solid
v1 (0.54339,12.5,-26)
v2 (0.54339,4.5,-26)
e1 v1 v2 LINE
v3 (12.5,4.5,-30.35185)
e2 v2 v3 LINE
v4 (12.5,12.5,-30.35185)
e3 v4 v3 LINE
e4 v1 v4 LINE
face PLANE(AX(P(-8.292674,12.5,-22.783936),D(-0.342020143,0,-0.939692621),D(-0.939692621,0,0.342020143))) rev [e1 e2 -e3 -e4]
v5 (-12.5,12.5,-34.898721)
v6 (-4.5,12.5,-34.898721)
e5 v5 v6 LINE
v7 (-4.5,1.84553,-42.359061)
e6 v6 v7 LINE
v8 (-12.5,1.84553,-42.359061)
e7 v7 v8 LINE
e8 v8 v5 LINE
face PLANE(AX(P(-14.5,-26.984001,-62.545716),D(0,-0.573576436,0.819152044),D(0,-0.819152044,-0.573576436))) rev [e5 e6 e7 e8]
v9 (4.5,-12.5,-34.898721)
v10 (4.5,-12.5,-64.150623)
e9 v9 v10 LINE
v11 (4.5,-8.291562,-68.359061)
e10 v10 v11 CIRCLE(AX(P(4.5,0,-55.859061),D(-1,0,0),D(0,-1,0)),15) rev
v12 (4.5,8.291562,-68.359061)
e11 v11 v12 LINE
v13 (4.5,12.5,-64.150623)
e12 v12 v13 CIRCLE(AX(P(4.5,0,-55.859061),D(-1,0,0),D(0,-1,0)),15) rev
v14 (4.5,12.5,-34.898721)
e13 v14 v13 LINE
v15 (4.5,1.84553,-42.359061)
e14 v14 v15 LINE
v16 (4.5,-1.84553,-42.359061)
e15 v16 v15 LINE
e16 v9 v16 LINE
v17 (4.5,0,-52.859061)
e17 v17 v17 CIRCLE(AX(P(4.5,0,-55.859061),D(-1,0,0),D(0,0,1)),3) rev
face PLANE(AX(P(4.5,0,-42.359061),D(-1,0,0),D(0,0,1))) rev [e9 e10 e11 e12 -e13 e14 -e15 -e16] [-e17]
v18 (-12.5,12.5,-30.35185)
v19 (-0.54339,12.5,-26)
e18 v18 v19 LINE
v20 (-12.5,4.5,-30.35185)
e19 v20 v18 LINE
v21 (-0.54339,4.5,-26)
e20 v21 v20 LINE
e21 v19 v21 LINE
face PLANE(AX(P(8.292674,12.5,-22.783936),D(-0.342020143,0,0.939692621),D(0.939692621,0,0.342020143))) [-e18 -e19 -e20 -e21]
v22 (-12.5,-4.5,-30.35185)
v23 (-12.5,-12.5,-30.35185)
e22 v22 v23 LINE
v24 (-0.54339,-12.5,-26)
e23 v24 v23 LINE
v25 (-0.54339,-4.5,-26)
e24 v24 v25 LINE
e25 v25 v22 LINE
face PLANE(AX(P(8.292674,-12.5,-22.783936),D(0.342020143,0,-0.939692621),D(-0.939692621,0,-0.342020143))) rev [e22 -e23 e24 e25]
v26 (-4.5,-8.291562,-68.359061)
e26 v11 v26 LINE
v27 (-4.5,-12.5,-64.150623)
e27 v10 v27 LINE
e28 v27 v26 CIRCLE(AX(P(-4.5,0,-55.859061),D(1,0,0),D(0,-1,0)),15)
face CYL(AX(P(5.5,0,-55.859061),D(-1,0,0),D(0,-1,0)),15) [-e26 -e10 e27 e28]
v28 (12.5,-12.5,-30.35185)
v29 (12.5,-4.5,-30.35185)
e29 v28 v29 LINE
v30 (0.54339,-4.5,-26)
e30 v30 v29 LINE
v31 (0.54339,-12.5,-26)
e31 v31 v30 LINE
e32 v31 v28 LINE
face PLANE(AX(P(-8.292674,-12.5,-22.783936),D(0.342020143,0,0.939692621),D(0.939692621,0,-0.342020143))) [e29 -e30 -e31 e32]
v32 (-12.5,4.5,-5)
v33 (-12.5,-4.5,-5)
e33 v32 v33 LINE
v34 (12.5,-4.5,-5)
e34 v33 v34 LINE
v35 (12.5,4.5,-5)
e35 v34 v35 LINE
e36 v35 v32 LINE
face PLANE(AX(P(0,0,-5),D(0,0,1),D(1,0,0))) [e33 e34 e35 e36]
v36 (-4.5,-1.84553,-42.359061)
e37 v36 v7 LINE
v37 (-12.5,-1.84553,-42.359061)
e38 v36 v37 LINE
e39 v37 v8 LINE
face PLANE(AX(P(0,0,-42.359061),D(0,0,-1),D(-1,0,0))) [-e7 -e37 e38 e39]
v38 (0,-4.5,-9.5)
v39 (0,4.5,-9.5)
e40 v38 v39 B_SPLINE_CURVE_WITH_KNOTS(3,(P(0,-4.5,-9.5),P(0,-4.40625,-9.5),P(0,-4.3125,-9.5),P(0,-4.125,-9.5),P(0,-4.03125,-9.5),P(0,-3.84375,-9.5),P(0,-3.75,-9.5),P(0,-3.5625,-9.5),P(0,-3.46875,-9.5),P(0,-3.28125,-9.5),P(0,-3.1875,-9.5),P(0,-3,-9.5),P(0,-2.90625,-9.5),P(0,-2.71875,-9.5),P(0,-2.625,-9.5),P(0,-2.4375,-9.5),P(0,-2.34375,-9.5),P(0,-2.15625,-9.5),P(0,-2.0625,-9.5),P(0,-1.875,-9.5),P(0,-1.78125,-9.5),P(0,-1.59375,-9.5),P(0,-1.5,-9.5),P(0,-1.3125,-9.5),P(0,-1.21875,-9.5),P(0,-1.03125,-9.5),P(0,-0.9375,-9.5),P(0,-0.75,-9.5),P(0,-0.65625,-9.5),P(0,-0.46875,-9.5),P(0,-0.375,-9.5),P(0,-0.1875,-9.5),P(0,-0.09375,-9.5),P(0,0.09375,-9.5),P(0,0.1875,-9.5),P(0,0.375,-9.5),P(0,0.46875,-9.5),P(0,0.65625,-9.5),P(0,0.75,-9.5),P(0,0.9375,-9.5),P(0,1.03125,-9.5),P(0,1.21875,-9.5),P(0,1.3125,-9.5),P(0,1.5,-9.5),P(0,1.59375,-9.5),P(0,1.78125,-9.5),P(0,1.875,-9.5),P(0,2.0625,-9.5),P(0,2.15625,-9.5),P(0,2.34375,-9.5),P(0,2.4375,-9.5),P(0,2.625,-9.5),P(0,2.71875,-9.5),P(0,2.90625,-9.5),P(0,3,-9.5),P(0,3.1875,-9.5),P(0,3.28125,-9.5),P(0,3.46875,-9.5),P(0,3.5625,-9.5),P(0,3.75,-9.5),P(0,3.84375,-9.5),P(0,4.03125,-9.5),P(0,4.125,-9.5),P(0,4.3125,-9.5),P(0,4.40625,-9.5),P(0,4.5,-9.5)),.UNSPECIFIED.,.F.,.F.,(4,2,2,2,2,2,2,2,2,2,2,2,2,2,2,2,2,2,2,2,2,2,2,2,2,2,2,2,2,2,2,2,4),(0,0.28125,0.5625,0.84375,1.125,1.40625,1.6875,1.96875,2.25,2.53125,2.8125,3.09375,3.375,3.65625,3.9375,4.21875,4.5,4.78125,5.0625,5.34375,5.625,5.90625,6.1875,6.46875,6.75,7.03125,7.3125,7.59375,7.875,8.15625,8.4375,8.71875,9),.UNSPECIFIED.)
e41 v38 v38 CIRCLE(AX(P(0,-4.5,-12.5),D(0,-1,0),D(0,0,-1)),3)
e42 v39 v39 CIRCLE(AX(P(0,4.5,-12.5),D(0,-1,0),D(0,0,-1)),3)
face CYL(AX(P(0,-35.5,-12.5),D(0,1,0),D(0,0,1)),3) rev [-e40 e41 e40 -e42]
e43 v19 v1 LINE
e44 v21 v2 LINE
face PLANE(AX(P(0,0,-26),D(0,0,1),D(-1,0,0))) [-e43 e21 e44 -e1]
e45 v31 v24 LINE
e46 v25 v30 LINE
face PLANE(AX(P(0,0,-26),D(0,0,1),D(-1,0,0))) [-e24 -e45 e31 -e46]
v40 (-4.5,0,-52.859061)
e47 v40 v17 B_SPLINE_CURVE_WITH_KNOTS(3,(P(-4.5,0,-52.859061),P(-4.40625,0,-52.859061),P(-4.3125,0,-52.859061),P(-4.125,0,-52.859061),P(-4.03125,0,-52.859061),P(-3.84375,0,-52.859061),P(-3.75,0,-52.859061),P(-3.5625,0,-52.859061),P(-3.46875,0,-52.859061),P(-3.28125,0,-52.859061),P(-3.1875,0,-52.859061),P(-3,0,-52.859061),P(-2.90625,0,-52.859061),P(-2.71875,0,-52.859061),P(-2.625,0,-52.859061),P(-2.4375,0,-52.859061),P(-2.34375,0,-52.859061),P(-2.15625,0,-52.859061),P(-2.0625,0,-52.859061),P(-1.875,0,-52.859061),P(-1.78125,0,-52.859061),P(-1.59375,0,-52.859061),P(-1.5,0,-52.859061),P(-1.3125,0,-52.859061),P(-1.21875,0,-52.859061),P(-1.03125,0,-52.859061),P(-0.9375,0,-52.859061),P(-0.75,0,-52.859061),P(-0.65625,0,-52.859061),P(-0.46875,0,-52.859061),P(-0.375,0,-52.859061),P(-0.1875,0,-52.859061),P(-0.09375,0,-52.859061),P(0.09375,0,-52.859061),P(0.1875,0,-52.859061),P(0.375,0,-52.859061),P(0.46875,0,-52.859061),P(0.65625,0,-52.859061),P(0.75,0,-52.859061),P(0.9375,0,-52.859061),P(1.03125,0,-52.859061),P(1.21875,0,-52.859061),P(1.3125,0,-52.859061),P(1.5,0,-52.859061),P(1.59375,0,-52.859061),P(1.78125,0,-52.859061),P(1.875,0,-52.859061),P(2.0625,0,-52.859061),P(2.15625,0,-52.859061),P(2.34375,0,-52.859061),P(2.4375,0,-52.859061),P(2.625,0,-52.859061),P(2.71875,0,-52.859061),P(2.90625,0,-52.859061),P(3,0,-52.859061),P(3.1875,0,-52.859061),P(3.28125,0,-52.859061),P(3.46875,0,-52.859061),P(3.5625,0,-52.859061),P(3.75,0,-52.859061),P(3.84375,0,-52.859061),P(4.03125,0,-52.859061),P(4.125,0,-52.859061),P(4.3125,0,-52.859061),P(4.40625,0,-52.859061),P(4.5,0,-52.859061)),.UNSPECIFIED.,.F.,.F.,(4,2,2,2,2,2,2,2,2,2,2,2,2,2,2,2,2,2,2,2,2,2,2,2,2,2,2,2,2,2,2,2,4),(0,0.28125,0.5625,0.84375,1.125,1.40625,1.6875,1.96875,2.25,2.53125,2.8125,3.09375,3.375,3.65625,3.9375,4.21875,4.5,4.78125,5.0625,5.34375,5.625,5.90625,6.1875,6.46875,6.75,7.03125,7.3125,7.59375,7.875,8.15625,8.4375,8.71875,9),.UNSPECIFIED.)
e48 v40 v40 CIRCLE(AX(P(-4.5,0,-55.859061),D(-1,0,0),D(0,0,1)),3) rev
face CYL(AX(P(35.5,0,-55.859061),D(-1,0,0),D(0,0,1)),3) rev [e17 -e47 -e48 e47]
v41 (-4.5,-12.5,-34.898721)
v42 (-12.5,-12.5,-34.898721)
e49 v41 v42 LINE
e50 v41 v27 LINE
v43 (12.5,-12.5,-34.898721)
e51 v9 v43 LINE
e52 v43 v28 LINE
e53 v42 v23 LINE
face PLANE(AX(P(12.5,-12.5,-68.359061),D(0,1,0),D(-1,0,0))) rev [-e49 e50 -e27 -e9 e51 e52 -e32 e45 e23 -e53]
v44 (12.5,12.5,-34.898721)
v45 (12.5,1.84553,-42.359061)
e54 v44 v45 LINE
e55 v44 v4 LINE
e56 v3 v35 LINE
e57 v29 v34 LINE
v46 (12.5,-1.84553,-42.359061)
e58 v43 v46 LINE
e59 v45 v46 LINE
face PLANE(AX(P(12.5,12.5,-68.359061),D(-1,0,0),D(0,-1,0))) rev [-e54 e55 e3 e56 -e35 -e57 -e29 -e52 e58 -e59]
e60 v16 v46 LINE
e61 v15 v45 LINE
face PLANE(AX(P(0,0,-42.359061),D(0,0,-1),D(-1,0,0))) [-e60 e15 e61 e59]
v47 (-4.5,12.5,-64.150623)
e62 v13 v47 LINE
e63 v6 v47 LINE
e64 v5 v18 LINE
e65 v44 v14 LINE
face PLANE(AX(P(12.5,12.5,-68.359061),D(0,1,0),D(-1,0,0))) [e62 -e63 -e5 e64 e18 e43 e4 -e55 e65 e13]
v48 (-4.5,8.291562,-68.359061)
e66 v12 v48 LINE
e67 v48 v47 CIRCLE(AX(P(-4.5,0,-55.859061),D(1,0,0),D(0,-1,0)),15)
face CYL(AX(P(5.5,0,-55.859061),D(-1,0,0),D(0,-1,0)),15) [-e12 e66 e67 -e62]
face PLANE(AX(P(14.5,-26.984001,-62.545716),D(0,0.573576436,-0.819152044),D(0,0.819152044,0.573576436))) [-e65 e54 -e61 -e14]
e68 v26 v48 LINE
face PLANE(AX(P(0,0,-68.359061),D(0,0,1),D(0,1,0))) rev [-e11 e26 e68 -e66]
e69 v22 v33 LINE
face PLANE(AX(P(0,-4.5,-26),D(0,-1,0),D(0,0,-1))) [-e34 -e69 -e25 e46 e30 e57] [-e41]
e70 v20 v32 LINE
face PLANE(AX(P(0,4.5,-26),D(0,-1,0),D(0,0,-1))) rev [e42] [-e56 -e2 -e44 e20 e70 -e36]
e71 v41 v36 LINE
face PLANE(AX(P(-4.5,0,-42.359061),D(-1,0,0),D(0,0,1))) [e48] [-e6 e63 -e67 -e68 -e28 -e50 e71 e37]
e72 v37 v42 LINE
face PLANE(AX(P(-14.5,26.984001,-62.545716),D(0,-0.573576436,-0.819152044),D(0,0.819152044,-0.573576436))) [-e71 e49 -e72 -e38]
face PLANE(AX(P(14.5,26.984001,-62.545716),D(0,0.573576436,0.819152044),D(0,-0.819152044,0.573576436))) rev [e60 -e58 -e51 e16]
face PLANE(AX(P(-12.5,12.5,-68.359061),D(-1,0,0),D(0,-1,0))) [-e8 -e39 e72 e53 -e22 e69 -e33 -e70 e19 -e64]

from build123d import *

# Parameters (mm, degrees)
SKETCH_1_W               = 25
SKETCH_1_H               = 25
EXTRUDE_1_DEPTH          = 68.359061336
SKETCH_2_W               = 25
SKETCH_2_H               = 8
CUT_EXTRUDE_3_DEPTH      = 26
CUT_EXTRUDE_START        = -17
SKETCH_4_R               = 3
CUT_EXTRUDE_4_DEPTH      = 57
MOVE_BODY_1_ANGLE        = 90
SKETCH_5_W               = 25
SKETCH_5_H               = 25
EXTRUDE_2_DEPTH          = 10
SKETCH_9_W               = 25
SKETCH_9_H               = 9
CUT_EXTRUDE_8_DEPTH      = 5
CUT_EXTRUDE_5_DEPTH      = 8
MIRROR_8_COPY_1_DEPTH    = 8
CUT_EXTRUDE_START_2      = 10
SKETCH_8_R               = 3
CUT_EXTRUDE_6_DEPTH      = 10
MIRROR_START             = 10
MIRROR_7_COPY_1_SKETCH_R = 3
MIRROR_7_COPY_1_DEPTH    = 10
CUT_EXTRUDE_9_DEPTH      = 10


# Read off the part's stored shape, not the designer's step: 교차1
with BuildPart() as part:
    # 스케치1 → 보스-돌출1 (new body)
    with BuildSketch(Plane.XY):
        Rectangle(SKETCH_1_W, SKETCH_1_H)
    extrude(amount=-EXTRUDE_1_DEPTH)

    # 스케치2 → 컷-돌출3 (cut)
    with BuildSketch(Plane(origin=(0, 0, -68.359061336), x_dir=(-1, 0, 0), z_dir=(0, 0, -1))):
        with Locations((0, 8.5)):
            Rectangle(SKETCH_2_W, SKETCH_2_H)
        with Locations((0, -8.5)):
            Rectangle(SKETCH_2_W, SKETCH_2_H)
    cut_extrude_3 = extrude(amount=-CUT_EXTRUDE_3_DEPTH, mode=Mode.SUBTRACT)

    # 스케치4 → 컷-돌출4 (cut)
    with BuildSketch(Plane.XZ.offset(-4.5).offset(CUT_EXTRUDE_START)):
        with Locations(Location((0, -55.859061336, 0), (0, 0, 90))):
            Circle(SKETCH_4_R)
    cut_extrude_4 = extrude(amount=CUT_EXTRUDE_4_DEPTH, mode=Mode.SUBTRACT)

    # 대칭 복사4: 컷-돌출3, 컷-돌출4 across plane
    add(cut_extrude_3.mirror(Plane.XY.offset(-34.179530668)), mode=Mode.SUBTRACT)
    add(cut_extrude_4.mirror(Plane.XY.offset(-34.179530668)), mode=Mode.SUBTRACT)


with BuildPart() as body_2:
    # 교차1: the piece on the far side of the plane
    add(part.part)
    split(bisect_by=Plane.XY.offset(-34.179530668), keep=Keep.BOTTOM)


with BuildPart() as part_1:
    add(part.part)

    # 교차1
    split(bisect_by=Plane.XY.offset(-34.179530668), keep=Keep.TOP)



with BuildPart() as body_2_1:
    # Move Body 1: moved
    add(body_2.part.rotate(Axis((0, 0, 0), (0, 0, 1)), MOVE_BODY_1_ANGLE))


with BuildPart() as part_2:
    add(part_1.part)

    add(body_2_1.part)  # 보스-돌출2 merges body 2
    # 스케치5 → 보스-돌출2 (add)
    with BuildSketch(Plane(origin=(0, 0, -42.359061336), x_dir=(-1, 0, 0), z_dir=(0, 0, -1))):
        Rectangle(SKETCH_5_W, SKETCH_5_H)
    extrude(amount=-EXTRUDE_2_DEPTH)

    # 스케치9 → 컷-돌출8 (cut)
    with BuildSketch(Plane.XY):
        Rectangle(SKETCH_9_W, SKETCH_9_H)
    extrude(amount=-CUT_EXTRUDE_8_DEPTH, mode=Mode.SUBTRACT)

    # 스케치7 → 컷-돌출5 (cut)
    with BuildSketch(Plane(origin=(-8, 4.5, 0), x_dir=(0, 0, 1), z_dir=(0, -1, 0))):
        Polygon((7.793639977, -63.756317597), (-41.547874973, 71.808380572), (-55.762350506, 74.314776125), (-6.420835555, -61.249922044), align=None)
    cut_extrude_5 = extrude(amount=-CUT_EXTRUDE_5_DEPTH, mode=Mode.SUBTRACT)

    # 대칭 복사5: 컷-돌출5 across plane
    add(cut_extrude_5.mirror(Plane(origin=(0, 0, 0), x_dir=(0, 0, 1), z_dir=(1, 0, 0))), mode=Mode.SUBTRACT)

    # 대칭 복사8: 컷-돌출5 across plane
    add(cut_extrude_5.mirror(Plane(origin=(0, 0, 0), x_dir=(0, 0, 1), z_dir=(0, -1, 0))), mode=Mode.SUBTRACT)

    # 대칭 복사8 copy 1 sketch → 대칭 복사8 copy 1 (cut)
    with BuildSketch(Plane(origin=(8, -4.5, 0), x_dir=(0, 0, 1), z_dir=(0, 1, 0))):
        Polygon((7.793639977, -63.756317597), (-41.547874973, 71.808380572), (-55.762350506, 74.314776125), (-6.420835555, -61.249922044), align=None)
    extrude(amount=-MIRROR_8_COPY_1_DEPTH, mode=Mode.SUBTRACT)

    # 스케치8 → 컷-돌출6 (cut)
    with BuildSketch(Plane(origin=(-4.5, 0, 0), x_dir=(0, 1, 0), z_dir=(-1, 0, 0)).offset(CUT_EXTRUDE_START_2)):
        Polygon((26.984001119, 62.545716444), (-15.512472392, 32.789365343), (-26.984001119, 49.172406229), (15.512472392, 78.92875733), align=None)
        with Locations(Location((0, 55.859061336, 0), (0, 0, 270))):
            Circle(SKETCH_8_R, mode=Mode.SUBTRACT)
    cut_extrude_6 = extrude(amount=-CUT_EXTRUDE_6_DEPTH, mode=Mode.SUBTRACT)

    # 대칭 복사6: 컷-돌출6 across plane
    add(cut_extrude_6.mirror(Plane(origin=(0, 0, 0), x_dir=(0, 0, 1), z_dir=(1, 0, 0))), mode=Mode.SUBTRACT)

    # 대칭 복사7: 컷-돌출6 across plane
    add(cut_extrude_6.mirror(Plane.ZX), mode=Mode.SUBTRACT)

    # 대칭 복사7 copy 1 sketch → 대칭 복사7 copy 1 (cut)
    with BuildSketch(Plane(origin=(4.5, 0, 0), x_dir=(0, -1, 0), z_dir=(1, 0, 0)).offset(MIRROR_START)):
        Polygon((26.984001119, 62.545716444), (-15.512472392, 32.789365343), (-26.984001119, 49.172406229), (15.512472392, 78.92875733), align=None)
        with Locations(Location((0, 55.859061336, 0), (0, 0, 270))):
            Circle(MIRROR_7_COPY_1_SKETCH_R, mode=Mode.SUBTRACT)
    extrude(amount=-MIRROR_7_COPY_1_DEPTH, mode=Mode.SUBTRACT)

    # 스케치10 → 컷-돌출9 (cut)
    with BuildSketch(Plane.ZY.offset(4.5)):
        with BuildLine():
            Line((-64.150623312, 12.5), (-68.359061336, 12.5))
            Line((-68.359061336, 12.5), (-68.359061336, 8.291561976))
            ThreePointArc((-68.359061336, 8.291561976), (-66.465663054, 10.606601718), (-64.150623312, 12.5))
        make_face()
        with BuildLine():
            Line((-64.150623312, -12.5), (-68.359061336, -12.5))
            Line((-68.359061336, -12.5), (-68.359061336, -8.291561976))
            ThreePointArc((-68.359061336, -8.291561976), (-66.465663054, -10.606601718), (-64.150623312, -12.5))
        make_face()
    extrude(amount=-CUT_EXTRUDE_9_DEPTH, mode=Mode.SUBTRACT)


solid = part_2.part
